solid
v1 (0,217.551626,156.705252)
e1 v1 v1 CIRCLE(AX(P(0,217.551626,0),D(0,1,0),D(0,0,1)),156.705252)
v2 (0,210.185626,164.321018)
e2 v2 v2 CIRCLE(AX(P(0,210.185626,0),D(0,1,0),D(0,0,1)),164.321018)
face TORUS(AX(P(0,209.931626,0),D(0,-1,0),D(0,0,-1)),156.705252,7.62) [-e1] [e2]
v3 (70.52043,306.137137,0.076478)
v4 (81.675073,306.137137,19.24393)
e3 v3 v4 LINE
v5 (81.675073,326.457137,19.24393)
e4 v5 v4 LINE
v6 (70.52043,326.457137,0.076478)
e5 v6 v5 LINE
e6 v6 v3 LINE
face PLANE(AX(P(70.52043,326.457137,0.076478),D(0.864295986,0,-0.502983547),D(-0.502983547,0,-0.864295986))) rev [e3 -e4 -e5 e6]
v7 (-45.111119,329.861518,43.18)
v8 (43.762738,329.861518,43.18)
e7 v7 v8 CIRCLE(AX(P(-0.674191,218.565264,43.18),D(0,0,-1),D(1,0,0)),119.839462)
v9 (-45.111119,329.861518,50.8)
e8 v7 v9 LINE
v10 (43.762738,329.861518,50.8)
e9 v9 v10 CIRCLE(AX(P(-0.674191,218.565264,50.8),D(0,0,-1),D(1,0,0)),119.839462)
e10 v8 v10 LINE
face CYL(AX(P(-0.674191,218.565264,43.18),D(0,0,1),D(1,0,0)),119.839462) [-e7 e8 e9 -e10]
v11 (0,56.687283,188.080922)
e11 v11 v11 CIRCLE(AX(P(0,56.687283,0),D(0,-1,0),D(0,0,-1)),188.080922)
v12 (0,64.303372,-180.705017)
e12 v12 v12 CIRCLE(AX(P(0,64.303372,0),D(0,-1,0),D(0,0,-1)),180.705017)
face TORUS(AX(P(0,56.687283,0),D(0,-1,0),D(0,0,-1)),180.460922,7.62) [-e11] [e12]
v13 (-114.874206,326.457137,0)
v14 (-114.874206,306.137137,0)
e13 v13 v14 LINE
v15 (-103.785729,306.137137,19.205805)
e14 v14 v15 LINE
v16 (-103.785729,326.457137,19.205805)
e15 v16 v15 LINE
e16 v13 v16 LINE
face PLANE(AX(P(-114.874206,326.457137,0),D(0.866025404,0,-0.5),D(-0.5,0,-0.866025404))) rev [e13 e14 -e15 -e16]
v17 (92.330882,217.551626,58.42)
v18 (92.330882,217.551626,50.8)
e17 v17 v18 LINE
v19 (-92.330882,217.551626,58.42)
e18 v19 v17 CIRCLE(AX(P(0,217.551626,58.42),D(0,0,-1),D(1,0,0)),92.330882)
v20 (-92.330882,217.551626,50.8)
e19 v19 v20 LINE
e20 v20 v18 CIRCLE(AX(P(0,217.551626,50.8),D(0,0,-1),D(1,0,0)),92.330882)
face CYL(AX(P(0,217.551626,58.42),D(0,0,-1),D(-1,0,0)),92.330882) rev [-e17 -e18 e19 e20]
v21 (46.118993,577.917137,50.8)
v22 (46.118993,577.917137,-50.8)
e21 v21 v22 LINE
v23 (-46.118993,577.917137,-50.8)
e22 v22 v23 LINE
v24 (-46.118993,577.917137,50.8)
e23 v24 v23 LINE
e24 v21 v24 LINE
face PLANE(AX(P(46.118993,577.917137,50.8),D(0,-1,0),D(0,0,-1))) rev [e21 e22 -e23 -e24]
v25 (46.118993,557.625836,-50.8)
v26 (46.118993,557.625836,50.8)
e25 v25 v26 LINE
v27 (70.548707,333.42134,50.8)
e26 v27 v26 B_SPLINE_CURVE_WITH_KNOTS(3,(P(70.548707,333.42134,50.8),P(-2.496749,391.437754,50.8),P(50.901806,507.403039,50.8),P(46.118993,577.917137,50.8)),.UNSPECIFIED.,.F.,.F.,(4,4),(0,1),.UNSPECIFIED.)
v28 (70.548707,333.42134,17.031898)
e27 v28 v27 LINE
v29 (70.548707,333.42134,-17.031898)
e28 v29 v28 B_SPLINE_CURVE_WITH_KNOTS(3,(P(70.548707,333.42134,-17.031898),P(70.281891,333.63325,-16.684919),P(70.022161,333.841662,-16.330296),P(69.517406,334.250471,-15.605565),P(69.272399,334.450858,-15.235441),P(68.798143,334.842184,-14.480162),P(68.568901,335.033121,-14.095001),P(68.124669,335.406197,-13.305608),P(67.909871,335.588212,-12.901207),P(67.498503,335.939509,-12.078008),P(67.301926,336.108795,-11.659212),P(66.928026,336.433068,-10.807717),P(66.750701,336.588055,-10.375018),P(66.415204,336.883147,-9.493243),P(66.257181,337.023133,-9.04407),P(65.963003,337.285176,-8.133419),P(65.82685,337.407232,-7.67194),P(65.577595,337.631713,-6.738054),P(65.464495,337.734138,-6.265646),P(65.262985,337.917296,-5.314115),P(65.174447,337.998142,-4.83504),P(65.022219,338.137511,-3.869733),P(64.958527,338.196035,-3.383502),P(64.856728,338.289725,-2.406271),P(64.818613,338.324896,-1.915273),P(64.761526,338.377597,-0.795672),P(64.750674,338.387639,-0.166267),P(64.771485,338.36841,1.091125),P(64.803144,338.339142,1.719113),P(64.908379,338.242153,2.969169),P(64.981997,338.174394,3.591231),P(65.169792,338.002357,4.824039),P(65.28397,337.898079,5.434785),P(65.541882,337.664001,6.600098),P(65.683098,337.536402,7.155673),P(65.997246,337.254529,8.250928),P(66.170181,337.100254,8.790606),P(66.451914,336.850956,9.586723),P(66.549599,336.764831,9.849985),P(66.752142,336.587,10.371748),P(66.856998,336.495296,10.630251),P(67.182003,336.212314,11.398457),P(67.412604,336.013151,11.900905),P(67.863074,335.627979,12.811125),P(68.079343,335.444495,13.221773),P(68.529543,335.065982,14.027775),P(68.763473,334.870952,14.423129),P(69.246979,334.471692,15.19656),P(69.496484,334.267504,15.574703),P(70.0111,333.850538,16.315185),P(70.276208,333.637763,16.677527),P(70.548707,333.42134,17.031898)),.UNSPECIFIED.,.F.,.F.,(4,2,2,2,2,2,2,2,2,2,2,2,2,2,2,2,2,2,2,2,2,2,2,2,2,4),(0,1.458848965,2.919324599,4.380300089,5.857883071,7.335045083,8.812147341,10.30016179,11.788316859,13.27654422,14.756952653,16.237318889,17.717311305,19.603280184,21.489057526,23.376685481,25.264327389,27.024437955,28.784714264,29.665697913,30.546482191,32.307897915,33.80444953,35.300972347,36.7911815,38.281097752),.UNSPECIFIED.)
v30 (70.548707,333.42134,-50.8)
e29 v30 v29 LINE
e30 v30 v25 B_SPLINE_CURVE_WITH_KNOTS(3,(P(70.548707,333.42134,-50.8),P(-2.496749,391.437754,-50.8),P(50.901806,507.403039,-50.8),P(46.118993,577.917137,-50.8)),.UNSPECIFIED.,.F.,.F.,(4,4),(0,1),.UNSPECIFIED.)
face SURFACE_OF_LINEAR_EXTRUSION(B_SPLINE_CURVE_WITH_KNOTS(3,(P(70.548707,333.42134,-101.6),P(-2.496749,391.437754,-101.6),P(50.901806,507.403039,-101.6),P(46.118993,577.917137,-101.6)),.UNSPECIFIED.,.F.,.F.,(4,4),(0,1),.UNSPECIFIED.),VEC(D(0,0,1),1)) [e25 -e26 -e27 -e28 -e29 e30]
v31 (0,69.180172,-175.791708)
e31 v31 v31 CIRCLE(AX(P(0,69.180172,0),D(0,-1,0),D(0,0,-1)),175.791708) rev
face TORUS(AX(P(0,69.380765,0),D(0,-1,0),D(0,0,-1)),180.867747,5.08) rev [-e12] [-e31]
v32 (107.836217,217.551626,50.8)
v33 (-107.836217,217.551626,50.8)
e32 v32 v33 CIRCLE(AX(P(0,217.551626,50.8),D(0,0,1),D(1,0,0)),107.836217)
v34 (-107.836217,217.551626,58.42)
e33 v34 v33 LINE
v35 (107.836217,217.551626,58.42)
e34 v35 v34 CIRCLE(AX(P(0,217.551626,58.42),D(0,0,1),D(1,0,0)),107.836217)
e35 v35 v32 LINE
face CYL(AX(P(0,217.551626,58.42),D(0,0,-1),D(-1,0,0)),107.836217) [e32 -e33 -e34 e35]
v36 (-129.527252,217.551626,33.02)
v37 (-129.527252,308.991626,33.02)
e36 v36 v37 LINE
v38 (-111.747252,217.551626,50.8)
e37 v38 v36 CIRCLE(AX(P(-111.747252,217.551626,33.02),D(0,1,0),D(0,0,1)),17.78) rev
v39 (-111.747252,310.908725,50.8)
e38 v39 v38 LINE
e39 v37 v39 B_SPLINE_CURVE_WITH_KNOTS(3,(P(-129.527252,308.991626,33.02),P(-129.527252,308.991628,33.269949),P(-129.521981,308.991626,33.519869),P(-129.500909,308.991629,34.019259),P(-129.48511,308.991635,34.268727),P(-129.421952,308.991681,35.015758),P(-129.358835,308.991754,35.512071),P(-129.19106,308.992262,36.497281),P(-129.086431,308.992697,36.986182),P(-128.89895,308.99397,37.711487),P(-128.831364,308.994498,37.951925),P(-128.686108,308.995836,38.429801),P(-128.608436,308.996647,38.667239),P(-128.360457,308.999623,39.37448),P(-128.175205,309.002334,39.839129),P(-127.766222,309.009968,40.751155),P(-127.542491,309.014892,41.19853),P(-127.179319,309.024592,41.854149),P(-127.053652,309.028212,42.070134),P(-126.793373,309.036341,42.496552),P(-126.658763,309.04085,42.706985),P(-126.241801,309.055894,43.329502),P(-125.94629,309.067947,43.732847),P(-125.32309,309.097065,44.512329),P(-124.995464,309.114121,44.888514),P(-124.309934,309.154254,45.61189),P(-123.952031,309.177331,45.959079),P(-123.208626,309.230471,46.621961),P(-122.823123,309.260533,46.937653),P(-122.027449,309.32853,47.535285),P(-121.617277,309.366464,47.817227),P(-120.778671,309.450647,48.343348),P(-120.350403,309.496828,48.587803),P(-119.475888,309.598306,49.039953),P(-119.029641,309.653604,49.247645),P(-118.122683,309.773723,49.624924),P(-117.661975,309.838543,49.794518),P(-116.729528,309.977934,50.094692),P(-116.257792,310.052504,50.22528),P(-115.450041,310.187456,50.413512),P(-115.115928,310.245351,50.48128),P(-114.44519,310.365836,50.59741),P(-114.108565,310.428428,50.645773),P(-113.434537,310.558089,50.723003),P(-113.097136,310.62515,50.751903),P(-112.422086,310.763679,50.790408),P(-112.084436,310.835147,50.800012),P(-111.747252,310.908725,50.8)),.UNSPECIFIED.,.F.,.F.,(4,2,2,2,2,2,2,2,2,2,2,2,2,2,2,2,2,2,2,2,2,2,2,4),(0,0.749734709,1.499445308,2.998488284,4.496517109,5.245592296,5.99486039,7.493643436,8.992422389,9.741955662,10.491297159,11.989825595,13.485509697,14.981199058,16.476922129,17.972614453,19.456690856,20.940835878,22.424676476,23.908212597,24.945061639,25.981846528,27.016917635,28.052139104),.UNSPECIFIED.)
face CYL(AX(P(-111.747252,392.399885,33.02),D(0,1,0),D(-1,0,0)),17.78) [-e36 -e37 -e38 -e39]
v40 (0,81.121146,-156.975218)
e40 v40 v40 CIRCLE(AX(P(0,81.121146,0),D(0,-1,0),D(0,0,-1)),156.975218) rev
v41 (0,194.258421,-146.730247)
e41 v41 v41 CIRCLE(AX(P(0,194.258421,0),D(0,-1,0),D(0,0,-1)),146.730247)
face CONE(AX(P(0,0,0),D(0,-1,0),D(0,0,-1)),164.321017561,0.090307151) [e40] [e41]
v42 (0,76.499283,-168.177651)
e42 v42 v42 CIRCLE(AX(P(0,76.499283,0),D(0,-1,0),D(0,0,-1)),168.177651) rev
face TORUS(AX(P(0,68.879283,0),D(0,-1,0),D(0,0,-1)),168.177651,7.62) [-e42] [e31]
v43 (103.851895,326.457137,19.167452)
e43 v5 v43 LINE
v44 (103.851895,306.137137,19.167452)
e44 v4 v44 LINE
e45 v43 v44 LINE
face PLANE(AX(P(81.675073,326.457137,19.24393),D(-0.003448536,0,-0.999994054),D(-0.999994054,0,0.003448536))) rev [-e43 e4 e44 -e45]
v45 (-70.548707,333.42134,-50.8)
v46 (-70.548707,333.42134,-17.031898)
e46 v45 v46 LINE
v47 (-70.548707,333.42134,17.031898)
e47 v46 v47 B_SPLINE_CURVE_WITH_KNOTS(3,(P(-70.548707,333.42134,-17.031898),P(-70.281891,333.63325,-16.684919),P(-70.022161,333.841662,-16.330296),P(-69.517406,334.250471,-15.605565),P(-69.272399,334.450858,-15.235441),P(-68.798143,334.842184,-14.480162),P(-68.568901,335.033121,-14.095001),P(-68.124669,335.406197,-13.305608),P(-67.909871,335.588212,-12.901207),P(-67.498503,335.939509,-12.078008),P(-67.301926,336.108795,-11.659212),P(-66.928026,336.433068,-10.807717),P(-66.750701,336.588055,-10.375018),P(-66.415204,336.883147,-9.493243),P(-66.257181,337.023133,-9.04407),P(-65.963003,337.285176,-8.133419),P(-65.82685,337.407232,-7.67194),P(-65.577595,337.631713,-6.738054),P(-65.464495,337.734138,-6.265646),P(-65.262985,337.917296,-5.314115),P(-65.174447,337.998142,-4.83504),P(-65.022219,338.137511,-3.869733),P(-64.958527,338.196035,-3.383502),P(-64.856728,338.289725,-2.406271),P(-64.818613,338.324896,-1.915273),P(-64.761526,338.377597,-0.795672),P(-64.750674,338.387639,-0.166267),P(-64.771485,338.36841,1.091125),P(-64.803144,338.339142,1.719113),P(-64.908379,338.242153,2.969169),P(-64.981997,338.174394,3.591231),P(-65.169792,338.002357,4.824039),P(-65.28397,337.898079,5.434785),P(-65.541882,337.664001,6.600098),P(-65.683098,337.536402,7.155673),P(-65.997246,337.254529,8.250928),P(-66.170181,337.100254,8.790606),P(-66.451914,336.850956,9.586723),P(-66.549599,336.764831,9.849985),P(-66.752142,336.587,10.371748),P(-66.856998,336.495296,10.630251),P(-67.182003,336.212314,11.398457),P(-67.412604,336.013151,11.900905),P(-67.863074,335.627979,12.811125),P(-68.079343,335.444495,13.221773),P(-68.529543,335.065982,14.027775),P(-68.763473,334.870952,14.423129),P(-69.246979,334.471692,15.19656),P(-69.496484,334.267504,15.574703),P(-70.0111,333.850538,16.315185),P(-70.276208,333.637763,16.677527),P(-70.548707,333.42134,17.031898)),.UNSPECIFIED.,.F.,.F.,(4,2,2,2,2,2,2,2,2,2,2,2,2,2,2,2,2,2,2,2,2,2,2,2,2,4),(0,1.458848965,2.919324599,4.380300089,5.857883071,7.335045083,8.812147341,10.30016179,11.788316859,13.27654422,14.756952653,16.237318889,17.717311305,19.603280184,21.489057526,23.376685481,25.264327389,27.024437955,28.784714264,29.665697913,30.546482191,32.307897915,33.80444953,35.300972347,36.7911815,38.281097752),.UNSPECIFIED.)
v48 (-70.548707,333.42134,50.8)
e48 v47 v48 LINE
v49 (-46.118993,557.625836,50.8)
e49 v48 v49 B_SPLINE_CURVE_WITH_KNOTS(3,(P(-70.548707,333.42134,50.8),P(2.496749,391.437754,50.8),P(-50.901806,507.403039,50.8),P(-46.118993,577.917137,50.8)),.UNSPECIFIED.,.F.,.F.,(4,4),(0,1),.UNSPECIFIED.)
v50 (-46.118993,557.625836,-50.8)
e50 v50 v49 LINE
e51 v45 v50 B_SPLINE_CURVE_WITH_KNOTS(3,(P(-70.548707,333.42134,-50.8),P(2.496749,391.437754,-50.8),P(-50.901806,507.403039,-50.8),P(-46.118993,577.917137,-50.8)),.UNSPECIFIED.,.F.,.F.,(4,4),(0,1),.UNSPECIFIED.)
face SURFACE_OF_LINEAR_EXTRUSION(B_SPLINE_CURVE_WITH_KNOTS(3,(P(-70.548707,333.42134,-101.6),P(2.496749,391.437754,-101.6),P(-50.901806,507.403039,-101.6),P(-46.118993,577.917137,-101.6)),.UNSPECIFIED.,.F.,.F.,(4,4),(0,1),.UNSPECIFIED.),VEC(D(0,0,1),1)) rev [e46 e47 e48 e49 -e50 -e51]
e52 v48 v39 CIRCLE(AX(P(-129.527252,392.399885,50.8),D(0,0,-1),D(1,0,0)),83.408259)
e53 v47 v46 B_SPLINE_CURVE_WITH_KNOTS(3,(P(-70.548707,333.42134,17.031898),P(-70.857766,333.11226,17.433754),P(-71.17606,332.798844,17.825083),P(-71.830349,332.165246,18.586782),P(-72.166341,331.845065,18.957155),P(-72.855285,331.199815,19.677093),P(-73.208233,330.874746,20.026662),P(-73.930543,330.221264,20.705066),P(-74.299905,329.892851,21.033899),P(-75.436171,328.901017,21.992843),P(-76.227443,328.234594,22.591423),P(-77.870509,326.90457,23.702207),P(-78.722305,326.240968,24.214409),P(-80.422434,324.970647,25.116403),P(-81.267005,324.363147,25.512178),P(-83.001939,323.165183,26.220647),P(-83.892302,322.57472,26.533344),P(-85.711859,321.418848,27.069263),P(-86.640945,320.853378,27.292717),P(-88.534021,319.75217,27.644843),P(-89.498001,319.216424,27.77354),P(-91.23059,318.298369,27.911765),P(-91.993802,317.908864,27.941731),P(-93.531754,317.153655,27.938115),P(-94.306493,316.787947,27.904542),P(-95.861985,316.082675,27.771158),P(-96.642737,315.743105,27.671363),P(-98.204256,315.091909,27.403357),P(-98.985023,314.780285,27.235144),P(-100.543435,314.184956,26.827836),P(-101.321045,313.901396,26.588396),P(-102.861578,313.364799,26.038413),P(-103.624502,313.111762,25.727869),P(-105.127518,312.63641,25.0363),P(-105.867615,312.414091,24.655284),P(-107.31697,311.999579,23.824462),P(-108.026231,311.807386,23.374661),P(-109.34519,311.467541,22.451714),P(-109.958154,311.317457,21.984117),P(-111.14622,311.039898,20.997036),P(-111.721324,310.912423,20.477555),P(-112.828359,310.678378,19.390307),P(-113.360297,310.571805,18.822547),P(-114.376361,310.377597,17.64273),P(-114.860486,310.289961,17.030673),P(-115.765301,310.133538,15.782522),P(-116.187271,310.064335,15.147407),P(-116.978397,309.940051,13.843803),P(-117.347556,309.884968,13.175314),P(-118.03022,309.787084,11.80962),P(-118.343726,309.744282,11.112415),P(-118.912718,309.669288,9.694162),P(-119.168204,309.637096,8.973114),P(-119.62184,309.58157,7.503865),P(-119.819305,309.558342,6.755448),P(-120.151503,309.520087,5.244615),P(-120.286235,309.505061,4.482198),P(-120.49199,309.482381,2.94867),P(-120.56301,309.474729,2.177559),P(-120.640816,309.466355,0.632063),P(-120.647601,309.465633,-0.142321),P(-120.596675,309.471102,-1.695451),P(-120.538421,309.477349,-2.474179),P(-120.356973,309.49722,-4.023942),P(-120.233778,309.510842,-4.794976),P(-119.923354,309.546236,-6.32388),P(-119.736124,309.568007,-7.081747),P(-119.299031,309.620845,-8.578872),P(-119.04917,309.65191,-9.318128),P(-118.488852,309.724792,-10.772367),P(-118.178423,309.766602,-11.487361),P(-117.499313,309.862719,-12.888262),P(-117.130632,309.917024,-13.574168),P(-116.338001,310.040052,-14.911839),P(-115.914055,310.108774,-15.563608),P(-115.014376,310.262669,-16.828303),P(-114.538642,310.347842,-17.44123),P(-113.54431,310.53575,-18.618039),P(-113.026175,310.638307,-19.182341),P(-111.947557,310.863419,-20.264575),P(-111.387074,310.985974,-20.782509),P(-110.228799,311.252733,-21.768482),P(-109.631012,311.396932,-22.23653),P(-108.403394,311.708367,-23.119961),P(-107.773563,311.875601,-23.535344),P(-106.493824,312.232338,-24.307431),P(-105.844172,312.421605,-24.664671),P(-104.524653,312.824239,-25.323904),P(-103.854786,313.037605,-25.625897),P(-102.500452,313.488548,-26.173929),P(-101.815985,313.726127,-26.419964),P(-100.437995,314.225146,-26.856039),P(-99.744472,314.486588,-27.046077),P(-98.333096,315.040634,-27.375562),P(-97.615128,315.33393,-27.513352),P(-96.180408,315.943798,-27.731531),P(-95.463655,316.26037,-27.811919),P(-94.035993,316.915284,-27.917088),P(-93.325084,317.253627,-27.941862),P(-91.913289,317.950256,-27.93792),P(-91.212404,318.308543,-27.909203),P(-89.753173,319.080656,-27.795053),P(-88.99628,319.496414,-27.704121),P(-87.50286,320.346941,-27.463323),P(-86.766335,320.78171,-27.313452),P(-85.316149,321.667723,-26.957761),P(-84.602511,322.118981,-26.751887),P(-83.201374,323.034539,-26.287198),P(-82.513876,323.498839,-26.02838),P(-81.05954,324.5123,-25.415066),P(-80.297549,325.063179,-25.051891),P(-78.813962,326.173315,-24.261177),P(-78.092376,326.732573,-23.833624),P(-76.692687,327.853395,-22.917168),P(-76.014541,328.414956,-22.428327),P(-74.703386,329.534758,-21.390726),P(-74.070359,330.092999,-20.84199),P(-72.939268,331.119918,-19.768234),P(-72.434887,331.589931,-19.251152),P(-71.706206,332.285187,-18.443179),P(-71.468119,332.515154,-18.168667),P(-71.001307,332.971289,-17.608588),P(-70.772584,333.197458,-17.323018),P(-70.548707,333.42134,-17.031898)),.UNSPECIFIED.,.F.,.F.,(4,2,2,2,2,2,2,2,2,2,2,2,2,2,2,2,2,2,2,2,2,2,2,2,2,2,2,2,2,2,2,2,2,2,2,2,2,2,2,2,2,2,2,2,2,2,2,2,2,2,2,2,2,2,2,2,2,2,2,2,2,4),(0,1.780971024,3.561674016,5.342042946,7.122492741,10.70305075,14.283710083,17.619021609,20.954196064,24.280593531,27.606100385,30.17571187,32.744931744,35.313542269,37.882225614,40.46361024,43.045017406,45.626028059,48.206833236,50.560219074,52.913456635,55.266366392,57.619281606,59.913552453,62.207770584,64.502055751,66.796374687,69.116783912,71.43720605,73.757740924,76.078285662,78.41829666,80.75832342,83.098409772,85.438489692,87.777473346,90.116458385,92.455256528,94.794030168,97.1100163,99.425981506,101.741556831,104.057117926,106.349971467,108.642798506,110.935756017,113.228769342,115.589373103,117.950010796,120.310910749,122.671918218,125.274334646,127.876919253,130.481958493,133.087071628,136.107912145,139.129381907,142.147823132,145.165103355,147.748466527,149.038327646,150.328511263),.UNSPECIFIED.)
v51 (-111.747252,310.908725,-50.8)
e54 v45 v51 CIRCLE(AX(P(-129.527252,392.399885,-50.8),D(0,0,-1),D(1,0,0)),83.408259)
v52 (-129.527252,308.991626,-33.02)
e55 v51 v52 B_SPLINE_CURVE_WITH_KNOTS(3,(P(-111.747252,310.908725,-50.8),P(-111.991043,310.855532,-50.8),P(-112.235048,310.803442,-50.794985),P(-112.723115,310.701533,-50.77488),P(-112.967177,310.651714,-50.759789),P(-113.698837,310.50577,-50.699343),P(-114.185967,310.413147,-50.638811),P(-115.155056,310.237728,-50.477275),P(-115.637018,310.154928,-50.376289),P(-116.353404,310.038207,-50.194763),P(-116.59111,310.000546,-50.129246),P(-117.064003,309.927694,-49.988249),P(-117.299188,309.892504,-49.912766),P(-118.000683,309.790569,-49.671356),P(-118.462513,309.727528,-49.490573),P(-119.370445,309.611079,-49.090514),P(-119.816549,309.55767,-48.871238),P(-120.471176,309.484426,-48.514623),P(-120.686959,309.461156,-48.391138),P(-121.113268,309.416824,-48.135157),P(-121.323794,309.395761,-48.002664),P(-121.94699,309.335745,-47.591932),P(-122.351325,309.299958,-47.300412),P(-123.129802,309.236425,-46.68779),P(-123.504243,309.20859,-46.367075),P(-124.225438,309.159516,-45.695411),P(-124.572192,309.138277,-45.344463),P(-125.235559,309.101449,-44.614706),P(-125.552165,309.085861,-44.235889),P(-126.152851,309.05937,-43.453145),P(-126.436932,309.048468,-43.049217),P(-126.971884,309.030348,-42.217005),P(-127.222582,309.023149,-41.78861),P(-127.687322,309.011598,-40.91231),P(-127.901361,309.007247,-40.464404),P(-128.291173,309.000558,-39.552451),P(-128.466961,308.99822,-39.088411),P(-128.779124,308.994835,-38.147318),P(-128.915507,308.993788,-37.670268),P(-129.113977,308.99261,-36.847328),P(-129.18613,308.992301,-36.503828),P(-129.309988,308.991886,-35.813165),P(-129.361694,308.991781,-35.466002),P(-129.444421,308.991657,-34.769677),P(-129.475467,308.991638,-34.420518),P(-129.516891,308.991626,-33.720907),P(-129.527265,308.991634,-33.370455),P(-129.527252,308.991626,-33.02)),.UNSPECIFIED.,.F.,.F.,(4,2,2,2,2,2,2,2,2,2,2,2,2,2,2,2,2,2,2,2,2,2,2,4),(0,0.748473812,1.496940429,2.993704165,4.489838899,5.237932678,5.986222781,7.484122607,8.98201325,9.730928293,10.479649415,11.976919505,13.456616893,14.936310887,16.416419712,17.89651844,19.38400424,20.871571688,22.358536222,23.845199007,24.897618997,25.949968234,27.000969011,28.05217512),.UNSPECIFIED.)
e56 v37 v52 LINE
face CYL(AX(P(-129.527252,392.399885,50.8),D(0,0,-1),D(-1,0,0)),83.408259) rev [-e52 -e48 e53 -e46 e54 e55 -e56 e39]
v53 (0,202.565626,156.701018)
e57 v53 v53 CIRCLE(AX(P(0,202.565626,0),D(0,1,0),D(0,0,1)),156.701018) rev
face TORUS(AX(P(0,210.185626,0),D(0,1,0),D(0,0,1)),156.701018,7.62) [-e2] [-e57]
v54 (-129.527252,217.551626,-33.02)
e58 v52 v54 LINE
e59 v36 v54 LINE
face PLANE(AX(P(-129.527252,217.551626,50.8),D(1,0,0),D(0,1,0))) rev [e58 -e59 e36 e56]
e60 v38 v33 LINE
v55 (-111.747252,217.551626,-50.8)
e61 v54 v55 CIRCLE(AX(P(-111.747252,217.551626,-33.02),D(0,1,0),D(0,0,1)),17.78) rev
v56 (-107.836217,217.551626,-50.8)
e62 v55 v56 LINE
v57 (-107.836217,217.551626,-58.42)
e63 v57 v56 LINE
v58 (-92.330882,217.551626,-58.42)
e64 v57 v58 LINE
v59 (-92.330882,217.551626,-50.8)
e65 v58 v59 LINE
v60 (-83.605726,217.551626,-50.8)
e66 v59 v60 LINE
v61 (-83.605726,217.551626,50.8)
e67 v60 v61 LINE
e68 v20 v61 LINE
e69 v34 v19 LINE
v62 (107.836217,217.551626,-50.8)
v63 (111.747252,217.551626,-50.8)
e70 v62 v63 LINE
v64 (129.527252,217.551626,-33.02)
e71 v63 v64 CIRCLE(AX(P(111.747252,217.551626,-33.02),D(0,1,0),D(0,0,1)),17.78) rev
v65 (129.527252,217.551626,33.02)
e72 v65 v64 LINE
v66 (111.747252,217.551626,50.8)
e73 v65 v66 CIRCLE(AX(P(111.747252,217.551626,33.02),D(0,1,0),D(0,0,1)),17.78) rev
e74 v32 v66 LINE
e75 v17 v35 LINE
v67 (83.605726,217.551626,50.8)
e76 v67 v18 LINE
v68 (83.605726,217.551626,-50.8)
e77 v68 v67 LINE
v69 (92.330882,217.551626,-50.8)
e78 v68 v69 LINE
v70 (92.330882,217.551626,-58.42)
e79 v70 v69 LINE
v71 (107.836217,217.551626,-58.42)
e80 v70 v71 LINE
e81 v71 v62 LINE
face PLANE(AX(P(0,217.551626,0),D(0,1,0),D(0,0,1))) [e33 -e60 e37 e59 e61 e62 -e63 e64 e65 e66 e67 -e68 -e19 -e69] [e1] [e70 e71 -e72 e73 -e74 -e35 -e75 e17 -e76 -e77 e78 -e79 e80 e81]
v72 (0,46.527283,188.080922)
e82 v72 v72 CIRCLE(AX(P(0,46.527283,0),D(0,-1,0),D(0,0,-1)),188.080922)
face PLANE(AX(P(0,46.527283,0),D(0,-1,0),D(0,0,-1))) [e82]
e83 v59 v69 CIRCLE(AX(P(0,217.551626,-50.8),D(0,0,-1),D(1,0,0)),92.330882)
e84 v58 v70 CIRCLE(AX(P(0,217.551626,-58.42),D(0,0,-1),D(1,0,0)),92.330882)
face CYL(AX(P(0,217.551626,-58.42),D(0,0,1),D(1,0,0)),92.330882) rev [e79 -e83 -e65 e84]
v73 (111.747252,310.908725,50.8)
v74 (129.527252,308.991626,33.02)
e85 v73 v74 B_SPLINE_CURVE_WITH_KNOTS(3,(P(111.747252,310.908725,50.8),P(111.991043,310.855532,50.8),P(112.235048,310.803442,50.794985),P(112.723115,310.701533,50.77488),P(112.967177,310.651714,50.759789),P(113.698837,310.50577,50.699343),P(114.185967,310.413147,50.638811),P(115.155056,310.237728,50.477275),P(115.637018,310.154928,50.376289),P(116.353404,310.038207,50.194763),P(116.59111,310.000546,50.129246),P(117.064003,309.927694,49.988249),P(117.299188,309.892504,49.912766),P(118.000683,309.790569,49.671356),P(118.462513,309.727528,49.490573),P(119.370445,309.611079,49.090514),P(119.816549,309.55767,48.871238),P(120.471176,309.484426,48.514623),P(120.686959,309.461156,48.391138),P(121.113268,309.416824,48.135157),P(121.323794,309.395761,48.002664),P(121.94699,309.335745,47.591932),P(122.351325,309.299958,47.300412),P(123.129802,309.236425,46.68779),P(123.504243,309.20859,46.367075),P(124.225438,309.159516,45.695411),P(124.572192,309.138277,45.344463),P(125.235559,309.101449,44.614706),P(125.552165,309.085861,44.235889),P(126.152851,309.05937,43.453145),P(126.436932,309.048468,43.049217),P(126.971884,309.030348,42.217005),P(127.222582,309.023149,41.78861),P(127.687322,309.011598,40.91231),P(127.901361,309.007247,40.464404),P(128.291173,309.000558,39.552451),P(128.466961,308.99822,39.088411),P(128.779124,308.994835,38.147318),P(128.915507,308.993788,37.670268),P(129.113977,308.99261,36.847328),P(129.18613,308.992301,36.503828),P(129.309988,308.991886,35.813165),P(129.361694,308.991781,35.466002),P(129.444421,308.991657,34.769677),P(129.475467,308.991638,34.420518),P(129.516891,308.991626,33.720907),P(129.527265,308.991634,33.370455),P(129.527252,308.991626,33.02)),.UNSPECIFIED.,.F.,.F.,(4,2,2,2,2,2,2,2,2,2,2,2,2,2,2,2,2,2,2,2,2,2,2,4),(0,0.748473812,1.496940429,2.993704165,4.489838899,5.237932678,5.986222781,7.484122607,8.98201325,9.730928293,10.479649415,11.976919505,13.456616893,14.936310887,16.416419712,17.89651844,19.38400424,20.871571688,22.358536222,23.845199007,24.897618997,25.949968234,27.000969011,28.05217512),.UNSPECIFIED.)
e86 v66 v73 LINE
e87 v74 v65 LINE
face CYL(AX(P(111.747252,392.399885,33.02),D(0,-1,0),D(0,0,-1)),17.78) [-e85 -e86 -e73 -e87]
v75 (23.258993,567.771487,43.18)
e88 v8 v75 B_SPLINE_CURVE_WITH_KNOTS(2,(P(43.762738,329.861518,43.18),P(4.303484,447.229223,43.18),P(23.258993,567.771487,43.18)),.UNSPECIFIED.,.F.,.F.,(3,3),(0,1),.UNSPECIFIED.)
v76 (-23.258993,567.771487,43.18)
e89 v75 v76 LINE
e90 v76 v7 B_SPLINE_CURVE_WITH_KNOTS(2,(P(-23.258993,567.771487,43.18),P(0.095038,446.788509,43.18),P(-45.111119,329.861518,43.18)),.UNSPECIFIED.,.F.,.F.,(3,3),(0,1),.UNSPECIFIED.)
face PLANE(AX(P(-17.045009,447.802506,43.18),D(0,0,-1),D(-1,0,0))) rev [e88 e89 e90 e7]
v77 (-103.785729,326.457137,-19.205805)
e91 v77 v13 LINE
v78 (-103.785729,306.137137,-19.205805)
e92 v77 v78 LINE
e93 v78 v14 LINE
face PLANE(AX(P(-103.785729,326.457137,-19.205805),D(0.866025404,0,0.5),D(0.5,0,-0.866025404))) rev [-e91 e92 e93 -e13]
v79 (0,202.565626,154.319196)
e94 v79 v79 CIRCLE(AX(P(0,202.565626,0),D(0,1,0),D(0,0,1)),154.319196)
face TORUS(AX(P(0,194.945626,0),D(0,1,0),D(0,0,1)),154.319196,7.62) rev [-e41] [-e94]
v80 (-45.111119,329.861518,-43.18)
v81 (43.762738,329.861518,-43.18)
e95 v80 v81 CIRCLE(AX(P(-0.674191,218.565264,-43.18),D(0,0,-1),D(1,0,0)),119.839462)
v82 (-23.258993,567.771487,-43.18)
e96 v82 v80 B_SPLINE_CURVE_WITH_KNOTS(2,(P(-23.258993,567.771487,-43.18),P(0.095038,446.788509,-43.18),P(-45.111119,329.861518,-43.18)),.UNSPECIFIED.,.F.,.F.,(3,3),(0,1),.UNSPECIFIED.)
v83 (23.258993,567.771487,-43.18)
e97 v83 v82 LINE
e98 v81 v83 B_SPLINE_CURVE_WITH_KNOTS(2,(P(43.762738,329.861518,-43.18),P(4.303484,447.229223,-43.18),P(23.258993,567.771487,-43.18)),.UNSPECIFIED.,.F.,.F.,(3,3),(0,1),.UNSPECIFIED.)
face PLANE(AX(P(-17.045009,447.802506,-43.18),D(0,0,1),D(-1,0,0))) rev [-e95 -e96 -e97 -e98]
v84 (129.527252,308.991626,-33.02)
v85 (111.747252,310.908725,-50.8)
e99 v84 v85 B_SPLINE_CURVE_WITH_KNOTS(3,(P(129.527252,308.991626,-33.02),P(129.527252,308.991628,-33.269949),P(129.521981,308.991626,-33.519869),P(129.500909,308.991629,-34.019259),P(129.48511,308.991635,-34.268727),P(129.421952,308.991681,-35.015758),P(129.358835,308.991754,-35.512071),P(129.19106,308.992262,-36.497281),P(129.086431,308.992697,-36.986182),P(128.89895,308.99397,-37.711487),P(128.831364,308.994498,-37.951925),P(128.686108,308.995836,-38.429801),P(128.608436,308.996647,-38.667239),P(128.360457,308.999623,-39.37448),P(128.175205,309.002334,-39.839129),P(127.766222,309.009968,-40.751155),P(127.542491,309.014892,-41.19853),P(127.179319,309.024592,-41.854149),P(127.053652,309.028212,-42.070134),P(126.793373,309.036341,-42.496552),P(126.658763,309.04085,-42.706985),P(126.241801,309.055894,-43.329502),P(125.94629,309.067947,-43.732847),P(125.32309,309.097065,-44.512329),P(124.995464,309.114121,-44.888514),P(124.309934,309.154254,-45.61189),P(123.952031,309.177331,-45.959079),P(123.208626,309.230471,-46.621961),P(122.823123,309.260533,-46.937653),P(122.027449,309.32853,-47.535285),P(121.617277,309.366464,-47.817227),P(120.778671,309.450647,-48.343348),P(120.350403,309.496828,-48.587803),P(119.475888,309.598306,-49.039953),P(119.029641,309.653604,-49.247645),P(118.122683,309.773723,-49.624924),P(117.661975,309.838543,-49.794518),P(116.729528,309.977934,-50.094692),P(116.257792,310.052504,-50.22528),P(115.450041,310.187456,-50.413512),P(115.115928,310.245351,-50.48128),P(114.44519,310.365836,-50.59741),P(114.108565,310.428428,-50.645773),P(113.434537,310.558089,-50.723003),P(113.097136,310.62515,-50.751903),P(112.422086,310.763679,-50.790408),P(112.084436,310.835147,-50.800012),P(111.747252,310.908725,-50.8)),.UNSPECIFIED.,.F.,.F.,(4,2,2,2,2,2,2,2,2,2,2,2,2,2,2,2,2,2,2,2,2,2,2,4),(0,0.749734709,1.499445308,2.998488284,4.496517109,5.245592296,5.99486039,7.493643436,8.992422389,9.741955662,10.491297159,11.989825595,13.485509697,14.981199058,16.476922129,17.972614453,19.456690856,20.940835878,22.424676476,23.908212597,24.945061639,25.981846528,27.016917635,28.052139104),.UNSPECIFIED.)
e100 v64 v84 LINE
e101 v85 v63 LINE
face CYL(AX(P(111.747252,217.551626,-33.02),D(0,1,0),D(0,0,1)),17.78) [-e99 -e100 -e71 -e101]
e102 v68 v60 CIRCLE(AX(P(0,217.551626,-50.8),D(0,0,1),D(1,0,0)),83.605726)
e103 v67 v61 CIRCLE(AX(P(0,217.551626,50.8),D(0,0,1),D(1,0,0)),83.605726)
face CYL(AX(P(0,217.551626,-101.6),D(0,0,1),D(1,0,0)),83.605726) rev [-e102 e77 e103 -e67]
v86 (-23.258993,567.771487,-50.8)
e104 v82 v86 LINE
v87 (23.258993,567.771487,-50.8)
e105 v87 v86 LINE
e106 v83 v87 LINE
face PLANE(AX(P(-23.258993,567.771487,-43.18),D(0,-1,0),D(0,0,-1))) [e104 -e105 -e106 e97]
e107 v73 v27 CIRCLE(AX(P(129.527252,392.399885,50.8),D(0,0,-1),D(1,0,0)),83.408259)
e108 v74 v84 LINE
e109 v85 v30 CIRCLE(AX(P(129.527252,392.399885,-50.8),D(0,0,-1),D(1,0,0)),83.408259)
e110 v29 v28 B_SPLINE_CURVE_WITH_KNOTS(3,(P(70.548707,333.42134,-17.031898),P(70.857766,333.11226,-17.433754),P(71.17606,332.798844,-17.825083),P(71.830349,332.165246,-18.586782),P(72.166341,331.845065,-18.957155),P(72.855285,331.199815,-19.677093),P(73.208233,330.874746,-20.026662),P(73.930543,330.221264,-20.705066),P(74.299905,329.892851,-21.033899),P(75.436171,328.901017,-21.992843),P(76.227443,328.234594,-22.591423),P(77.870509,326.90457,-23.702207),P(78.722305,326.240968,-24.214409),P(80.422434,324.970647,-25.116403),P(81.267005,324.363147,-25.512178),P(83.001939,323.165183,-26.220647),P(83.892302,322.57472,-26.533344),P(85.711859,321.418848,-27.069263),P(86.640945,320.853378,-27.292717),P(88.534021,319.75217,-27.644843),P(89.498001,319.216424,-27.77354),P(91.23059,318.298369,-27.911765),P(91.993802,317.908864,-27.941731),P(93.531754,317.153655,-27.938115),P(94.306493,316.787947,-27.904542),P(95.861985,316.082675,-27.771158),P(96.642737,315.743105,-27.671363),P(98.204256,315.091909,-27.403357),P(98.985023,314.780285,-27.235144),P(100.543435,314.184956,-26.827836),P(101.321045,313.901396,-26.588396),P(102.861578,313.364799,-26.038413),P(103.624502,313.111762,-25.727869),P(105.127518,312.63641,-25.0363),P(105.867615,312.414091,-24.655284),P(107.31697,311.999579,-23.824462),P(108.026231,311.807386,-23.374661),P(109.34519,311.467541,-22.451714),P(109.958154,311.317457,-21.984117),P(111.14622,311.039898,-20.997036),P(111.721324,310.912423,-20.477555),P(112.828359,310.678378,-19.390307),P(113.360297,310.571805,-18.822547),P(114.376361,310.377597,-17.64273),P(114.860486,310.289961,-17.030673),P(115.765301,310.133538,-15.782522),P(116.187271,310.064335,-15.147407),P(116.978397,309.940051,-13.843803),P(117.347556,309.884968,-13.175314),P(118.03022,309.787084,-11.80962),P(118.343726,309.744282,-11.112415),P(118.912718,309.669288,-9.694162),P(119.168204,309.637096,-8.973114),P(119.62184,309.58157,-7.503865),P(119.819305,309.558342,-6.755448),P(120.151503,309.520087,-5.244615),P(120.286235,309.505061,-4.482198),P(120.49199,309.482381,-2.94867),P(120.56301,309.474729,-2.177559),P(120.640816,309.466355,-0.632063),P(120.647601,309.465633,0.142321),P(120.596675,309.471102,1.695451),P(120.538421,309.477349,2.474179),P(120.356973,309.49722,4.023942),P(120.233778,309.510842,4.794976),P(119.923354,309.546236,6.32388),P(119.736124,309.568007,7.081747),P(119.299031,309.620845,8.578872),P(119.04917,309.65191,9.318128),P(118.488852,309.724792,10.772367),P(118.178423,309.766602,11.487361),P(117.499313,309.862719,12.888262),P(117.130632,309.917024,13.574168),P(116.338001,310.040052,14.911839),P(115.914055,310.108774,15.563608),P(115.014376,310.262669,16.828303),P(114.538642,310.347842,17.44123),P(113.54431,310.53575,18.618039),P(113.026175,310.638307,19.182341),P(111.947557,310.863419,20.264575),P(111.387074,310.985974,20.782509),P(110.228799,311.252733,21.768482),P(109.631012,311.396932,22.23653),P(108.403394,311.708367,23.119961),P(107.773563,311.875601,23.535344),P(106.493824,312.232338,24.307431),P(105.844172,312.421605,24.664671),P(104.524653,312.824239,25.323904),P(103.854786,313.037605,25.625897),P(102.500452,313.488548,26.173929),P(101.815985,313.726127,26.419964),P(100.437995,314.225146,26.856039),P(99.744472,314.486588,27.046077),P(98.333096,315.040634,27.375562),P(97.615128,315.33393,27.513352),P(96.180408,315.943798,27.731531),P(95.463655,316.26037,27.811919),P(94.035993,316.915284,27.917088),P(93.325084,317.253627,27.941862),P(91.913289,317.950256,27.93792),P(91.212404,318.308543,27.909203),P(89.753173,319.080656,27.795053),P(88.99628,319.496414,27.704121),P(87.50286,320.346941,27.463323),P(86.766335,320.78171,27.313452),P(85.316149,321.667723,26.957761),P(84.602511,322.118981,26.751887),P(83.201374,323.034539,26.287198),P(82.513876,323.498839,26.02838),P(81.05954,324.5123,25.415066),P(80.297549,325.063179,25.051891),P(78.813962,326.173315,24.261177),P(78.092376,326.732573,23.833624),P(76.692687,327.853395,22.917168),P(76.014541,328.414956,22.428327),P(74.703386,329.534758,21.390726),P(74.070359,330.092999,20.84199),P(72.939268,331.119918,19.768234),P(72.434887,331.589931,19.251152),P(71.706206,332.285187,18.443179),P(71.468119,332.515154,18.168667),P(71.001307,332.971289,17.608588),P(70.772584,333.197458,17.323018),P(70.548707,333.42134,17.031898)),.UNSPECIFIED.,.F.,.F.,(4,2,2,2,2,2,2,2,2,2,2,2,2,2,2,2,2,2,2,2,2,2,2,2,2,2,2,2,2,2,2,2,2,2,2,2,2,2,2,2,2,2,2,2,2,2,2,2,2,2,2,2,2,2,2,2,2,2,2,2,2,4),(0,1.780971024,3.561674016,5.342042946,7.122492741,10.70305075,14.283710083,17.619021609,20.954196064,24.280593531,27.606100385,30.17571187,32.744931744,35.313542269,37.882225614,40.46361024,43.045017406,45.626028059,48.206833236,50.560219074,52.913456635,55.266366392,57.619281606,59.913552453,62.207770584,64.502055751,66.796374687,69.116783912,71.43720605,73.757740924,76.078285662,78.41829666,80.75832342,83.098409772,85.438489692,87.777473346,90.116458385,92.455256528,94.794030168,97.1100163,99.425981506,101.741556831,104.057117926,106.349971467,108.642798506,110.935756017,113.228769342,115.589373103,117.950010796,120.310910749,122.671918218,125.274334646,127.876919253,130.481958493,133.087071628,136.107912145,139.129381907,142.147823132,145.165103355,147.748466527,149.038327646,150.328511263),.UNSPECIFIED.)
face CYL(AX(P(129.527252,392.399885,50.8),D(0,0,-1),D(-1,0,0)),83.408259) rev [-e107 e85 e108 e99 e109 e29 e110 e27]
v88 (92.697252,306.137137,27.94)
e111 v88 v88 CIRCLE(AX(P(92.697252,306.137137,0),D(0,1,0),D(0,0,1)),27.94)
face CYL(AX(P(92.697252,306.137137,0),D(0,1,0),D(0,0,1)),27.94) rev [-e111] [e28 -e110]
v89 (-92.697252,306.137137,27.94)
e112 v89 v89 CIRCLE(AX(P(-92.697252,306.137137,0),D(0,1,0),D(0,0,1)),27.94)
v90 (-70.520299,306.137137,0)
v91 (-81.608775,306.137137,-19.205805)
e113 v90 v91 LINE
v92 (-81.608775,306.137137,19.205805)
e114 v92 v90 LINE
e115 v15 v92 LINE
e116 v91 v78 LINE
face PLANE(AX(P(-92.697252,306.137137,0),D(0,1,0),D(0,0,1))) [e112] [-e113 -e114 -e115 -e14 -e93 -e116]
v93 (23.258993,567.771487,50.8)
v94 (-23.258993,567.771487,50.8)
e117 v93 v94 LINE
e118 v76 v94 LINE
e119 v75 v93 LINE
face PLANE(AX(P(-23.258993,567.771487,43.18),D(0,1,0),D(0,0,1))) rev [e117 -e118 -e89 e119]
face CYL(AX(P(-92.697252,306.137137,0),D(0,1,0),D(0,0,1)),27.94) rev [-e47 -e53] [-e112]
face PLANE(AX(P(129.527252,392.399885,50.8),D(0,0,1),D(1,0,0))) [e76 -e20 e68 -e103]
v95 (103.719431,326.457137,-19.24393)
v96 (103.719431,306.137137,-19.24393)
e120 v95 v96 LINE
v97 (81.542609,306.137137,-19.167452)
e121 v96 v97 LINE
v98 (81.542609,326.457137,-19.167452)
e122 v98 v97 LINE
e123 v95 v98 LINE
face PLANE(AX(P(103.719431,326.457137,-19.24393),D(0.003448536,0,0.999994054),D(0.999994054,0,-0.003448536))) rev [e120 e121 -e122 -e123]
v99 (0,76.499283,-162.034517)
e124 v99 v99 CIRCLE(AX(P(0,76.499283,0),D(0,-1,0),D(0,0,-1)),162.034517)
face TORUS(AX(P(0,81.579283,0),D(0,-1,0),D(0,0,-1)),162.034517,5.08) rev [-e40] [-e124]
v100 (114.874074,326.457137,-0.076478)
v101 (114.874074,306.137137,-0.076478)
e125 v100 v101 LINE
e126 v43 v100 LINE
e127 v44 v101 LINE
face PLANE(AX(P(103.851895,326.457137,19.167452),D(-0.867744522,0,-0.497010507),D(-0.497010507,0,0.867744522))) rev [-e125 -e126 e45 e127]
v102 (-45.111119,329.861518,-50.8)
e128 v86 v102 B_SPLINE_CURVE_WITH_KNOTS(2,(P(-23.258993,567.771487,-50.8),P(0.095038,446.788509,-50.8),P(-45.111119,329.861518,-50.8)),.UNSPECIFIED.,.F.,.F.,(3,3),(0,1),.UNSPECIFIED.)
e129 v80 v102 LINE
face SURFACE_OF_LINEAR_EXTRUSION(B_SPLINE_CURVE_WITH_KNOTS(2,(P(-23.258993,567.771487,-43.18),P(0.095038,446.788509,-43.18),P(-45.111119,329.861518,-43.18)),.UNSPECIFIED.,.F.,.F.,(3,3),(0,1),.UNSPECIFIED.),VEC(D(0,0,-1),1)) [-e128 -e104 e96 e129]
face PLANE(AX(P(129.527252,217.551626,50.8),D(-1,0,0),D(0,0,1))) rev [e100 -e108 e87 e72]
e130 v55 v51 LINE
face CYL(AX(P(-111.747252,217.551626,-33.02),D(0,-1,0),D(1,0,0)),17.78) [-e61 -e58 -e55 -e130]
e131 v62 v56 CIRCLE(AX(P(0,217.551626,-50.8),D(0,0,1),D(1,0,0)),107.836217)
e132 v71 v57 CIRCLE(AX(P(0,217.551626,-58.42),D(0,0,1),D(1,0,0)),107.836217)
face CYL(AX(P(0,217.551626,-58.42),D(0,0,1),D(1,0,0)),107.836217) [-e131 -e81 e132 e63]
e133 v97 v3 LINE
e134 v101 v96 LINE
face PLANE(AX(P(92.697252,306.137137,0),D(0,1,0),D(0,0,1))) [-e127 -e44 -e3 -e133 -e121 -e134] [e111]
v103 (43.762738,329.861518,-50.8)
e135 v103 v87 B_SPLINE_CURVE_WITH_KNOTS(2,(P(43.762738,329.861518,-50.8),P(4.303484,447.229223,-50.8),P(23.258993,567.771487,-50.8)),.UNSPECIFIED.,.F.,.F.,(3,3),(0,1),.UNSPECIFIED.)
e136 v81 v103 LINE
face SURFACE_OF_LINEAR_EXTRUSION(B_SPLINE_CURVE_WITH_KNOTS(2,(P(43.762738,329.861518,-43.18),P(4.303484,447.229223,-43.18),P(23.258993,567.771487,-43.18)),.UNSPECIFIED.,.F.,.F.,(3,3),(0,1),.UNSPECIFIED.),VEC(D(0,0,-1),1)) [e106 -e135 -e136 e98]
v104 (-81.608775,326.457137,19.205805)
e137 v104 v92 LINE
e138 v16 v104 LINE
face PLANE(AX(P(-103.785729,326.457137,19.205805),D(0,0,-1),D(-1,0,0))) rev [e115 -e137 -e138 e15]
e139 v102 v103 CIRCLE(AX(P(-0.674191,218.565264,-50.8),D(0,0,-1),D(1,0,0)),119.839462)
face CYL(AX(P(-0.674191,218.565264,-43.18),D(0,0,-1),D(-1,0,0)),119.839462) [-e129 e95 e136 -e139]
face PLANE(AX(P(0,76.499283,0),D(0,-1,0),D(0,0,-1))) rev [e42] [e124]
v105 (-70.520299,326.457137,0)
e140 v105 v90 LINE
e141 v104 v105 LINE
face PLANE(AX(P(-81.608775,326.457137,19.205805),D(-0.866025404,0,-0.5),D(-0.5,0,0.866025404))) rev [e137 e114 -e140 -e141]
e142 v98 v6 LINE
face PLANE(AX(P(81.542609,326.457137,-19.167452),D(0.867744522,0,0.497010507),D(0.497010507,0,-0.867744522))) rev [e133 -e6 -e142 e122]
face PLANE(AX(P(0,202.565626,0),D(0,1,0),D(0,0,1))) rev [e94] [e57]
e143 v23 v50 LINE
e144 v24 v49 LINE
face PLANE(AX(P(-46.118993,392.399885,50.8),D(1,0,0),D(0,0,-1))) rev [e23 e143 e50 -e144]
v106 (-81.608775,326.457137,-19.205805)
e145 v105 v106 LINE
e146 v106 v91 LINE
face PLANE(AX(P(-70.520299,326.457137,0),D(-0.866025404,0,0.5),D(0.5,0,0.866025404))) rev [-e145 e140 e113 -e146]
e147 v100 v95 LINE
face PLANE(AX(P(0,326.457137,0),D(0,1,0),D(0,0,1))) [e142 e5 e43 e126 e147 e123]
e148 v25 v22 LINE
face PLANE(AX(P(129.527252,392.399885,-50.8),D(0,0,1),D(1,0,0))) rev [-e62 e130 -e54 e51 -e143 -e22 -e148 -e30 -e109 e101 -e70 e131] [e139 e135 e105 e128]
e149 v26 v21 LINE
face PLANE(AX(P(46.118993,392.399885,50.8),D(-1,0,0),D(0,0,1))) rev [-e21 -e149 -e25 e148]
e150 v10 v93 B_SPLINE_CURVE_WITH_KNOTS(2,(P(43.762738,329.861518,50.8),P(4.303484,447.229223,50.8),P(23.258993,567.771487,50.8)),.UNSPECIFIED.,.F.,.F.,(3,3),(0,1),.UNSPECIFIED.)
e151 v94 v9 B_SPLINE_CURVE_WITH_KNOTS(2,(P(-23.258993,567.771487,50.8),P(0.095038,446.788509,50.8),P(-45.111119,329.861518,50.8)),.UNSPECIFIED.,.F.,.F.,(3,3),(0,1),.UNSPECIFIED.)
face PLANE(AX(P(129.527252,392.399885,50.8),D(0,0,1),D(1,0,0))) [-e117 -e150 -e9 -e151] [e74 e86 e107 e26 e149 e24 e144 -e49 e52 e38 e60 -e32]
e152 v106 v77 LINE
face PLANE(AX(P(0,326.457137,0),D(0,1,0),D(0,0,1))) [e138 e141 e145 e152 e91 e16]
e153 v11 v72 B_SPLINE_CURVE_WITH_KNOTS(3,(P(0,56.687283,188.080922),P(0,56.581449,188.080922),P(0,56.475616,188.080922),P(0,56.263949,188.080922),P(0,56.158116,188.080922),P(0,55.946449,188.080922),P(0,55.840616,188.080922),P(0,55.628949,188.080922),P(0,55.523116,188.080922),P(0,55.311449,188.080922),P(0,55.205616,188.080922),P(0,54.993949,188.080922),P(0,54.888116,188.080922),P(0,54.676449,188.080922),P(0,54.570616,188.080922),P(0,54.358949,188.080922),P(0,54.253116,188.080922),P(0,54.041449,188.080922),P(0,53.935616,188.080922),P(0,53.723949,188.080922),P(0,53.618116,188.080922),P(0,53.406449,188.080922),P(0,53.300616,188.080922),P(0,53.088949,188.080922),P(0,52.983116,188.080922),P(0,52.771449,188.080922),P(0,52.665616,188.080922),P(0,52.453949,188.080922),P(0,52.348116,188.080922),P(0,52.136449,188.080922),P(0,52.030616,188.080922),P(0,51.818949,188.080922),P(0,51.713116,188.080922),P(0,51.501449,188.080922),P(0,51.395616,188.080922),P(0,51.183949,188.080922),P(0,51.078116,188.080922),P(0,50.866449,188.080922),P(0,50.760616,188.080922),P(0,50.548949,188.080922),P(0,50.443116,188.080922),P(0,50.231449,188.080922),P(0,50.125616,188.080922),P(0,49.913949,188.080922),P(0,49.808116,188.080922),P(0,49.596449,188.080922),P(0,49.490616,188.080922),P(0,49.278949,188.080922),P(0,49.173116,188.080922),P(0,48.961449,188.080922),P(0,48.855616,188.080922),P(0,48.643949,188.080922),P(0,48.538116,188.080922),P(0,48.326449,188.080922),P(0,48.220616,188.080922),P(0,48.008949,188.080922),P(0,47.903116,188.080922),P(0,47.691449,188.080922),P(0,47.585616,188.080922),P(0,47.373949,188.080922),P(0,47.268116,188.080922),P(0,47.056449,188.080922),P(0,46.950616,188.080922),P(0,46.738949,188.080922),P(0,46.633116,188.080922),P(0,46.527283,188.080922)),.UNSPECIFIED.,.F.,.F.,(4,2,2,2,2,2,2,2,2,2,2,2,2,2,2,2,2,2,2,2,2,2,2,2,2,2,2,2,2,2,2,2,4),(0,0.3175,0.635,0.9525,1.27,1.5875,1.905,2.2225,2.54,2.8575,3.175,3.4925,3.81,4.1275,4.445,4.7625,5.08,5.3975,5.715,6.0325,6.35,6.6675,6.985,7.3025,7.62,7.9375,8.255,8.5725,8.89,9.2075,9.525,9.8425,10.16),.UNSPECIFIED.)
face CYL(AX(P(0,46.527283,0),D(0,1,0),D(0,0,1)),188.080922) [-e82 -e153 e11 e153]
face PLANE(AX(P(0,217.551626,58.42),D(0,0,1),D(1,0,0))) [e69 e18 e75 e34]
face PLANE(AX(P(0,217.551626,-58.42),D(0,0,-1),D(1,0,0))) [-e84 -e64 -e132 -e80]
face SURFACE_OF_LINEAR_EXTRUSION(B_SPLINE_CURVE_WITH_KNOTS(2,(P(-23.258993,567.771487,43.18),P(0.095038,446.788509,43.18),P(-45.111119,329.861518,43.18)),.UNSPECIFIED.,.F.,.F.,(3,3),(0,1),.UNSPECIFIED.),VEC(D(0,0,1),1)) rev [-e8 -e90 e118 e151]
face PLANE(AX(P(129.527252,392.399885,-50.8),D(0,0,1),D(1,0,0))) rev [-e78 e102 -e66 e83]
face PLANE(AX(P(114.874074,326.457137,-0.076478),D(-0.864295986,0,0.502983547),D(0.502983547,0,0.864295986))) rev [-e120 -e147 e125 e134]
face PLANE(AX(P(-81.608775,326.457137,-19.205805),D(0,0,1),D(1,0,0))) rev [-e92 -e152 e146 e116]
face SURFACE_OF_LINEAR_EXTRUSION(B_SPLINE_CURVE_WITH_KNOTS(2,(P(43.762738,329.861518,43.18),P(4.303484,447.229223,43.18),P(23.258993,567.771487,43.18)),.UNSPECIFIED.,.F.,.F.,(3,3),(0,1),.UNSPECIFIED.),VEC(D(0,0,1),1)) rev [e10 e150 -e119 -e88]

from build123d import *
from build123d.topology import SkipClean

# Parameters (mm, degrees)
SKETCH4_R                = 164.321017561
BOSS_EXTRUDE1_DEPTH      = 14.986
FILLET2_R                = 7.62
FILLET3_R                = 7.62
CUT_EXTRUDE1_DEPTH       = 293.37
CUT_EXTRUDE1_DEPTH_BACK  = 364.998
SKETCH5_W                = 518.073680805
SKETCH5_H                = 61.893758326
CUT_EXTRUDE3_DEPTH       = 203.2
CUT_EXTRUDE3_DEPTH_BACK  = 323.342
SKETCH9_W                = 416.570842546
SKETCH9_H                = 115.149663793
CUT_EXTRUDE4_DEPTH       = 265.684
CUT_EXTRUDE4_DEPTH_BACK  = 314.452
SKETCH10_W               = 357.2970731
SKETCH10_H               = 56.159317183
SKETCH11_R               = 175.797651342
BOSS_EXTRUDE5_DEPTH      = 12.192
FILLET4_R                = 7.62
FILLET5_R                = 5.08
SKETCH12_R               = 188.080921631
BOSS_EXTRUDE6_DEPTH      = 17.78
FILLET6_R                = 7.62
FILLET7_R                = 5.08
BOSS_EXTRUDE7_DEPTH      = 50.8
BOSS_EXTRUDE7_DEPTH_BACK = 50.8
CUT_EXTRUDE5_DEPTH       = 152.4
CUT_EXTRUDE7_DEPTH       = 152.4
BOSS_EXTRUDE8_DEPTH      = 7.62
CUT_EXTRUDE8_DEPTH       = 7.62
SKETCH19_R               = 27.94
CUT_EXTRUDE9_DEPTH       = 271.78
BOSS_EXTRUDE9_DEPTH      = 20.32
FILLET8_R                = 17.78


with BuildPart() as part:
    # Sketch3 → Revolve1 (revolve)
    with BuildSketch(Plane.XY, mode=Mode.PRIVATE) as revolve1_sk:
        Polygon((0, 202.565626223), (0, 0), (164.321017561, 0), (145.978001078, 202.565626223), align=None)
    revolve(revolve1_sk.sketch.rotate(Axis((0, 202.565626223, 0), (0, -1, 0)), 90), axis=Axis((0, 202.565626223, 0), (0, -1, 0)))

    # Sketch4 → Boss-Extrude1 (add)
    with BuildSketch(Plane(origin=(0, 202.565626223, 0), x_dir=(1, 0, 0), z_dir=(0, 1, 0))):
        with Locations(Location((0, 0, 0), (0, 0, 270))):
            Circle(SKETCH4_R)
    extrude(amount=BOSS_EXTRUDE1_DEPTH)

    # Fillet2
    fillet2_edges = [part.edges().sort_by_distance(p)[0] for p in [
        (0, 202.565626223, -145.978001078),
        (0, 202.565626223, -164.321017561),
    ]]
    fillet(fillet2_edges, radius=FILLET2_R)

    # Fillet3
    # the kernel refuses this fillet: 7.62 mm, written as the material it takes off along each edge
    with BuildSketch(Plane(origin=(0, 217.551626223, 0), x_dir=(0, 0, 1), z_dir=(-1, 0, 0))) as fillet3_piece_1:
        with BuildLine():
            CenterArc((156.705252071, -7.62), FILLET3_R, 1.910213172, 88.089786828)
            Line((156.705252071, 0), (156.705252071, 0.1524))
            Line((156.705252071, 0.1524), (164.321017561, 0.1524))
            Line((164.321017561, 0.1524), (164.473417561, 0))
            ThreePointArc((164.473417561, 0), (164.473417561, -3.683), (164.47333287, -7.36092))
            Line((164.47333287, -7.36092), (164.321017561, -7.366))
        make_face()
    revolve(axis=Axis((0, 217.551626223, 0), (0, 1, 0)), mode=Mode.SUBTRACT)

    # Sketch5 → Cut-Extrude1 (cut, two sides: drawn at the far end of the back side and taken through both)
    with BuildSketch(Plane.XY.offset(-CUT_EXTRUDE1_DEPTH_BACK)):
        with Locations((-6.112963785, -11.191101175)):
            Rectangle(SKETCH5_W, SKETCH5_H)
    extrude(amount=CUT_EXTRUDE1_DEPTH + CUT_EXTRUDE1_DEPTH_BACK, mode=Mode.SUBTRACT)

    # Sketch9 → Cut-Extrude3 (cut, two sides: drawn at the far end of the back side and taken through both)
    with BuildSketch(Plane.XY.offset(-CUT_EXTRUDE3_DEPTH_BACK)):
        with Locations((4.402781263, 6.552117647)):
            Rectangle(SKETCH9_W, SKETCH9_H)
    extrude(amount=CUT_EXTRUDE3_DEPTH + CUT_EXTRUDE3_DEPTH_BACK, mode=Mode.SUBTRACT)

    # Sketch10 → Cut-Extrude4 (cut, two sides: drawn at the far end of the back side and taken through both)
    with BuildSketch(Plane.XY.offset(-CUT_EXTRUDE4_DEPTH_BACK)):
        with Locations((3.537594783, 48.419624174)):
            Rectangle(SKETCH10_W, SKETCH10_H)
    extrude(amount=CUT_EXTRUDE4_DEPTH + CUT_EXTRUDE4_DEPTH_BACK, mode=Mode.SUBTRACT)

    # Sketch11 → Boss-Extrude5 (add)
    with BuildSketch(Plane.XZ.offset(-76.499282765)):
        with Locations(Location((0, 0, 0), (0, 0, 270))):
            Circle(SKETCH11_R)
    extrude(amount=BOSS_EXTRUDE5_DEPTH)

    # Fillet4
    fillet4_edges = [part.edges().sort_by_distance(p)[0] for p in [
        (0, 76.499282765, 175.797651342),
    ]]
    fillet(fillet4_edges, radius=FILLET4_R)

    # Fillet5
    fillet5_edges = [part.edges().sort_by_distance(p)[0] for p in [
        (0, 76.499282765, -157.393743517),
    ]]
    fillet(fillet5_edges, radius=FILLET5_R)

    # Sketch12 → Boss-Extrude6 (add)
    with BuildSketch(Plane.XZ.offset(-64.307282765)):
        with Locations(Location((0, 0, 0), (0, 0, 90))):
            Circle(SKETCH12_R)
    extrude(amount=BOSS_EXTRUDE6_DEPTH)

    # Fillet6
    fillet6_edges = [part.edges().sort_by_distance(p)[0] for p in [
        (0, 64.307282765, -188.080921631),
    ]]
    fillet(fillet6_edges, radius=FILLET6_R)

    # Fillet7
    # the kernel refuses this fillet: 5.08 mm, written as the material it adds along each edge
    with BuildSketch(Plane(origin=(0, 64.307282765, 0), x_dir=(0, 0, -1), z_dir=(-1, 0, 0))) as fillet7_piece_1:
        with BuildLine():
            CenterArc((180.867746514, -5.073482324), FILLET7_R, 91.835695834, 85.901288996)
            Line((175.791708445, -4.872889395), (175.284104639, -4.852830102))
            ThreePointArc((175.284104639, -4.852830102), (175.289651342, -4.572), (175.289651342, 0))
            Line((175.289651342, 0), (175.797651342, 0.508))
            ThreePointArc((175.797651342, 0.508), (180.460921631, 0.508), (180.688743566, 0.511649898))
            Line((180.688743566, 0.511649898), (180.705016561, 0.003910605))
        make_face()
    revolve(axis=Axis((0, 64.307282765, 0), (0, -1, 0)))

    # Sketch13 → Boss-Extrude7 (add, two sides: drawn at the far end of the back side and taken through both)
    with SkipClean():  # the faces are left unmerged after this step: merging them gives an invalid solid
        with BuildSketch(Plane.XY.offset(-BOSS_EXTRUDE7_DEPTH_BACK)):
            with BuildLine():
                Line((-129.527252071, 217.551626223), (-129.527252071, 308.991626223))
                ThreePointArc((-129.527252071, 308.991626223), (-70.548706673, 333.421339616), (-46.11899328, 392.399885013))
                Line((-46.11899328, 392.399885013), (-46.11899328, 577.917136616))
                Line((-46.11899328, 577.917136616), (46.11899328, 577.917136616))
                Line((46.11899328, 577.917136616), (46.11899328, 392.399885013))
                ThreePointArc((46.11899328, 392.399885013), (70.548706673, 333.421339616), (129.527252071, 308.991626223))
                Line((129.527252071, 308.991626223), (129.527252071, 217.551626223))
                Line((129.527252071, 217.551626223), (-129.527252071, 217.551626223))
            make_face()
        extrude(amount=BOSS_EXTRUDE7_DEPTH + BOSS_EXTRUDE7_DEPTH_BACK)

    # Sketch14 → Cut-Extrude5 (cut)
    with SkipClean():  # the faces are left unmerged after this step: merging them gives an invalid solid
        with BuildSketch(Plane.XY.offset(50.8)):
            with BuildLine():
                Line((-83.605725686, 217.551626223), (83.605725686, 217.551626223))
                ThreePointArc((83.605725686, 217.551626223), (0, 301.157351909), (-83.605725686, 217.551626223))
            make_face()
        extrude(amount=-CUT_EXTRUDE5_DEPTH, mode=Mode.SUBTRACT)

    # Sketch15 → Cut-Extrude7 (cut)
    with SkipClean():  # the faces are left unmerged after this step: merging them gives an invalid solid
        with BuildSketch(Plane.XY.offset(50.8)):
            with BuildLine():
                Line((-46.11899328, 577.917136616), (-98.36214643, 577.917136616))
                Line((-98.36214643, 577.917136616), (-70.548706673, 333.421339616))
                add(Edge.make_bspline(
                    [(-46.11899328, 577.917136616), (-50.901805556, 507.403039432), (2.496749097, 391.437753678), (-70.548706673, 333.421339616)],
                    knots=[0, 0, 0, 0, 1, 1, 1, 1], degree=3))
            make_face()
        cut_extrude7 = extrude(amount=-CUT_EXTRUDE7_DEPTH, mode=Mode.SUBTRACT)

    # Mirror3: Cut-Extrude7 across plane
    with SkipClean():  # the faces are left unmerged after this step: merging them gives an invalid solid
        add(cut_extrude7.mirror(Plane(origin=(0, 0, 0), x_dir=(0, 0, 1), z_dir=(1, 0, 0))), mode=Mode.SUBTRACT)

    # Sketch16 → Boss-Extrude8 (add)
    with SkipClean():  # the faces are left unmerged after this step: merging them gives an invalid solid
        with BuildSketch(Plane.XY.offset(50.8)):
            with BuildLine():
                Line((-92.330882192, 217.551626223), (-107.83621715, 217.551626223))
                ThreePointArc((-107.83621715, 217.551626223), (0, 325.387843373), (107.83621715, 217.551626223))
                Line((107.83621715, 217.551626223), (92.330882192, 217.551626223))
                ThreePointArc((92.330882192, 217.551626223), (0, 309.882508415), (-92.330882192, 217.551626223))
            make_face()
        boss_extrude8 = extrude(amount=BOSS_EXTRUDE8_DEPTH)

    # Mirror4: Boss-Extrude8 across plane
    with SkipClean():  # the faces are left unmerged after this step: merging them gives an invalid solid
        add(boss_extrude8.mirror(Plane.XY))

    # Sketch17 → Cut-Extrude8 (cut)
    with SkipClean():  # the faces are left unmerged after this step: merging them gives an invalid solid
        with BuildSketch(Plane.XY.offset(50.8)):
            with BuildLine():
                Line((-23.25899328, 567.771486767), (23.25899328, 567.771486767))
                add(Edge.make_bspline(
                    [(43.762737549, 329.861517955), (4.303483733, 447.229222708), (23.25899328, 567.771486767)],
                    knots=[0, 0, 0, 1, 1, 1], degree=2))
                ThreePointArc((43.762737549, 329.861517955), (-0.674190735, 338.40472639), (-45.111119018, 329.861517955))
                add(Edge.make_bspline(
                    [(-45.111119018, 329.861517955), (0.095038205, 446.788509156), (-23.25899328, 567.771486767)],
                    knots=[0, 0, 0, 1, 1, 1], degree=2))
            make_face()
        cut_extrude8 = extrude(amount=-CUT_EXTRUDE8_DEPTH, mode=Mode.SUBTRACT)

    # Mirror5: Cut-Extrude8 across plane
    with SkipClean():  # the faces are left unmerged after this step: merging them gives an invalid solid
        add(cut_extrude8.mirror(Plane.XY), mode=Mode.SUBTRACT)

    # Sketch19 → Cut-Extrude9 (cut)
    with SkipClean():  # the faces are left unmerged after this step: merging them gives an invalid solid
        with BuildSketch(Plane(origin=(0, 577.917136616, 0), x_dir=(1, 0, 0), z_dir=(0, 1, 0))):
            with Locations(Location((-92.697252071, 0, 0), (0, 0, 270))):
                Circle(SKETCH19_R)
            with Locations(Location((92.697252071, 0, 0), (0, 0, 270))):
                Circle(SKETCH19_R)
        extrude(amount=-CUT_EXTRUDE9_DEPTH, mode=Mode.SUBTRACT)

    # Sketch20 → Boss-Extrude9 (add)
    with SkipClean():  # the faces are left unmerged after this step: merging them gives an invalid solid
        with BuildSketch(Plane(origin=(0, 306.137136616, 0), x_dir=(1, 0, 0), z_dir=(0, 1, 0))):
            Polygon((-114.874205528, 0), (-103.785728799, -19.205805073), (-81.608775342, -19.205805073), (-70.520298613, 0), (-81.608775342, 19.205805073), (-103.785728799, 19.205805073), align=None)
            Polygon((70.520430482, -0.07647803), (81.675073193, -19.243929886), (103.851894782, -19.167451856), (114.874073659, 0.07647803), (103.719430948, 19.243929886), (81.54260936, 19.167451856), align=None)
        extrude(amount=BOSS_EXTRUDE9_DEPTH)

    # Fillet8
    fillet8_edges = [part.edges().sort_by_distance(p)[0] for p in [
        (129.527252071, 263.271626223, -50.8),
        (-129.527252071, 263.271626223, -50.8),
        (129.527252071, 263.271626223, 50.8),
        (-129.527252071, 263.271626223, 50.8),
    ]]
    fillet(fillet8_edges, radius=FILLET8_R)


solid = part.part
